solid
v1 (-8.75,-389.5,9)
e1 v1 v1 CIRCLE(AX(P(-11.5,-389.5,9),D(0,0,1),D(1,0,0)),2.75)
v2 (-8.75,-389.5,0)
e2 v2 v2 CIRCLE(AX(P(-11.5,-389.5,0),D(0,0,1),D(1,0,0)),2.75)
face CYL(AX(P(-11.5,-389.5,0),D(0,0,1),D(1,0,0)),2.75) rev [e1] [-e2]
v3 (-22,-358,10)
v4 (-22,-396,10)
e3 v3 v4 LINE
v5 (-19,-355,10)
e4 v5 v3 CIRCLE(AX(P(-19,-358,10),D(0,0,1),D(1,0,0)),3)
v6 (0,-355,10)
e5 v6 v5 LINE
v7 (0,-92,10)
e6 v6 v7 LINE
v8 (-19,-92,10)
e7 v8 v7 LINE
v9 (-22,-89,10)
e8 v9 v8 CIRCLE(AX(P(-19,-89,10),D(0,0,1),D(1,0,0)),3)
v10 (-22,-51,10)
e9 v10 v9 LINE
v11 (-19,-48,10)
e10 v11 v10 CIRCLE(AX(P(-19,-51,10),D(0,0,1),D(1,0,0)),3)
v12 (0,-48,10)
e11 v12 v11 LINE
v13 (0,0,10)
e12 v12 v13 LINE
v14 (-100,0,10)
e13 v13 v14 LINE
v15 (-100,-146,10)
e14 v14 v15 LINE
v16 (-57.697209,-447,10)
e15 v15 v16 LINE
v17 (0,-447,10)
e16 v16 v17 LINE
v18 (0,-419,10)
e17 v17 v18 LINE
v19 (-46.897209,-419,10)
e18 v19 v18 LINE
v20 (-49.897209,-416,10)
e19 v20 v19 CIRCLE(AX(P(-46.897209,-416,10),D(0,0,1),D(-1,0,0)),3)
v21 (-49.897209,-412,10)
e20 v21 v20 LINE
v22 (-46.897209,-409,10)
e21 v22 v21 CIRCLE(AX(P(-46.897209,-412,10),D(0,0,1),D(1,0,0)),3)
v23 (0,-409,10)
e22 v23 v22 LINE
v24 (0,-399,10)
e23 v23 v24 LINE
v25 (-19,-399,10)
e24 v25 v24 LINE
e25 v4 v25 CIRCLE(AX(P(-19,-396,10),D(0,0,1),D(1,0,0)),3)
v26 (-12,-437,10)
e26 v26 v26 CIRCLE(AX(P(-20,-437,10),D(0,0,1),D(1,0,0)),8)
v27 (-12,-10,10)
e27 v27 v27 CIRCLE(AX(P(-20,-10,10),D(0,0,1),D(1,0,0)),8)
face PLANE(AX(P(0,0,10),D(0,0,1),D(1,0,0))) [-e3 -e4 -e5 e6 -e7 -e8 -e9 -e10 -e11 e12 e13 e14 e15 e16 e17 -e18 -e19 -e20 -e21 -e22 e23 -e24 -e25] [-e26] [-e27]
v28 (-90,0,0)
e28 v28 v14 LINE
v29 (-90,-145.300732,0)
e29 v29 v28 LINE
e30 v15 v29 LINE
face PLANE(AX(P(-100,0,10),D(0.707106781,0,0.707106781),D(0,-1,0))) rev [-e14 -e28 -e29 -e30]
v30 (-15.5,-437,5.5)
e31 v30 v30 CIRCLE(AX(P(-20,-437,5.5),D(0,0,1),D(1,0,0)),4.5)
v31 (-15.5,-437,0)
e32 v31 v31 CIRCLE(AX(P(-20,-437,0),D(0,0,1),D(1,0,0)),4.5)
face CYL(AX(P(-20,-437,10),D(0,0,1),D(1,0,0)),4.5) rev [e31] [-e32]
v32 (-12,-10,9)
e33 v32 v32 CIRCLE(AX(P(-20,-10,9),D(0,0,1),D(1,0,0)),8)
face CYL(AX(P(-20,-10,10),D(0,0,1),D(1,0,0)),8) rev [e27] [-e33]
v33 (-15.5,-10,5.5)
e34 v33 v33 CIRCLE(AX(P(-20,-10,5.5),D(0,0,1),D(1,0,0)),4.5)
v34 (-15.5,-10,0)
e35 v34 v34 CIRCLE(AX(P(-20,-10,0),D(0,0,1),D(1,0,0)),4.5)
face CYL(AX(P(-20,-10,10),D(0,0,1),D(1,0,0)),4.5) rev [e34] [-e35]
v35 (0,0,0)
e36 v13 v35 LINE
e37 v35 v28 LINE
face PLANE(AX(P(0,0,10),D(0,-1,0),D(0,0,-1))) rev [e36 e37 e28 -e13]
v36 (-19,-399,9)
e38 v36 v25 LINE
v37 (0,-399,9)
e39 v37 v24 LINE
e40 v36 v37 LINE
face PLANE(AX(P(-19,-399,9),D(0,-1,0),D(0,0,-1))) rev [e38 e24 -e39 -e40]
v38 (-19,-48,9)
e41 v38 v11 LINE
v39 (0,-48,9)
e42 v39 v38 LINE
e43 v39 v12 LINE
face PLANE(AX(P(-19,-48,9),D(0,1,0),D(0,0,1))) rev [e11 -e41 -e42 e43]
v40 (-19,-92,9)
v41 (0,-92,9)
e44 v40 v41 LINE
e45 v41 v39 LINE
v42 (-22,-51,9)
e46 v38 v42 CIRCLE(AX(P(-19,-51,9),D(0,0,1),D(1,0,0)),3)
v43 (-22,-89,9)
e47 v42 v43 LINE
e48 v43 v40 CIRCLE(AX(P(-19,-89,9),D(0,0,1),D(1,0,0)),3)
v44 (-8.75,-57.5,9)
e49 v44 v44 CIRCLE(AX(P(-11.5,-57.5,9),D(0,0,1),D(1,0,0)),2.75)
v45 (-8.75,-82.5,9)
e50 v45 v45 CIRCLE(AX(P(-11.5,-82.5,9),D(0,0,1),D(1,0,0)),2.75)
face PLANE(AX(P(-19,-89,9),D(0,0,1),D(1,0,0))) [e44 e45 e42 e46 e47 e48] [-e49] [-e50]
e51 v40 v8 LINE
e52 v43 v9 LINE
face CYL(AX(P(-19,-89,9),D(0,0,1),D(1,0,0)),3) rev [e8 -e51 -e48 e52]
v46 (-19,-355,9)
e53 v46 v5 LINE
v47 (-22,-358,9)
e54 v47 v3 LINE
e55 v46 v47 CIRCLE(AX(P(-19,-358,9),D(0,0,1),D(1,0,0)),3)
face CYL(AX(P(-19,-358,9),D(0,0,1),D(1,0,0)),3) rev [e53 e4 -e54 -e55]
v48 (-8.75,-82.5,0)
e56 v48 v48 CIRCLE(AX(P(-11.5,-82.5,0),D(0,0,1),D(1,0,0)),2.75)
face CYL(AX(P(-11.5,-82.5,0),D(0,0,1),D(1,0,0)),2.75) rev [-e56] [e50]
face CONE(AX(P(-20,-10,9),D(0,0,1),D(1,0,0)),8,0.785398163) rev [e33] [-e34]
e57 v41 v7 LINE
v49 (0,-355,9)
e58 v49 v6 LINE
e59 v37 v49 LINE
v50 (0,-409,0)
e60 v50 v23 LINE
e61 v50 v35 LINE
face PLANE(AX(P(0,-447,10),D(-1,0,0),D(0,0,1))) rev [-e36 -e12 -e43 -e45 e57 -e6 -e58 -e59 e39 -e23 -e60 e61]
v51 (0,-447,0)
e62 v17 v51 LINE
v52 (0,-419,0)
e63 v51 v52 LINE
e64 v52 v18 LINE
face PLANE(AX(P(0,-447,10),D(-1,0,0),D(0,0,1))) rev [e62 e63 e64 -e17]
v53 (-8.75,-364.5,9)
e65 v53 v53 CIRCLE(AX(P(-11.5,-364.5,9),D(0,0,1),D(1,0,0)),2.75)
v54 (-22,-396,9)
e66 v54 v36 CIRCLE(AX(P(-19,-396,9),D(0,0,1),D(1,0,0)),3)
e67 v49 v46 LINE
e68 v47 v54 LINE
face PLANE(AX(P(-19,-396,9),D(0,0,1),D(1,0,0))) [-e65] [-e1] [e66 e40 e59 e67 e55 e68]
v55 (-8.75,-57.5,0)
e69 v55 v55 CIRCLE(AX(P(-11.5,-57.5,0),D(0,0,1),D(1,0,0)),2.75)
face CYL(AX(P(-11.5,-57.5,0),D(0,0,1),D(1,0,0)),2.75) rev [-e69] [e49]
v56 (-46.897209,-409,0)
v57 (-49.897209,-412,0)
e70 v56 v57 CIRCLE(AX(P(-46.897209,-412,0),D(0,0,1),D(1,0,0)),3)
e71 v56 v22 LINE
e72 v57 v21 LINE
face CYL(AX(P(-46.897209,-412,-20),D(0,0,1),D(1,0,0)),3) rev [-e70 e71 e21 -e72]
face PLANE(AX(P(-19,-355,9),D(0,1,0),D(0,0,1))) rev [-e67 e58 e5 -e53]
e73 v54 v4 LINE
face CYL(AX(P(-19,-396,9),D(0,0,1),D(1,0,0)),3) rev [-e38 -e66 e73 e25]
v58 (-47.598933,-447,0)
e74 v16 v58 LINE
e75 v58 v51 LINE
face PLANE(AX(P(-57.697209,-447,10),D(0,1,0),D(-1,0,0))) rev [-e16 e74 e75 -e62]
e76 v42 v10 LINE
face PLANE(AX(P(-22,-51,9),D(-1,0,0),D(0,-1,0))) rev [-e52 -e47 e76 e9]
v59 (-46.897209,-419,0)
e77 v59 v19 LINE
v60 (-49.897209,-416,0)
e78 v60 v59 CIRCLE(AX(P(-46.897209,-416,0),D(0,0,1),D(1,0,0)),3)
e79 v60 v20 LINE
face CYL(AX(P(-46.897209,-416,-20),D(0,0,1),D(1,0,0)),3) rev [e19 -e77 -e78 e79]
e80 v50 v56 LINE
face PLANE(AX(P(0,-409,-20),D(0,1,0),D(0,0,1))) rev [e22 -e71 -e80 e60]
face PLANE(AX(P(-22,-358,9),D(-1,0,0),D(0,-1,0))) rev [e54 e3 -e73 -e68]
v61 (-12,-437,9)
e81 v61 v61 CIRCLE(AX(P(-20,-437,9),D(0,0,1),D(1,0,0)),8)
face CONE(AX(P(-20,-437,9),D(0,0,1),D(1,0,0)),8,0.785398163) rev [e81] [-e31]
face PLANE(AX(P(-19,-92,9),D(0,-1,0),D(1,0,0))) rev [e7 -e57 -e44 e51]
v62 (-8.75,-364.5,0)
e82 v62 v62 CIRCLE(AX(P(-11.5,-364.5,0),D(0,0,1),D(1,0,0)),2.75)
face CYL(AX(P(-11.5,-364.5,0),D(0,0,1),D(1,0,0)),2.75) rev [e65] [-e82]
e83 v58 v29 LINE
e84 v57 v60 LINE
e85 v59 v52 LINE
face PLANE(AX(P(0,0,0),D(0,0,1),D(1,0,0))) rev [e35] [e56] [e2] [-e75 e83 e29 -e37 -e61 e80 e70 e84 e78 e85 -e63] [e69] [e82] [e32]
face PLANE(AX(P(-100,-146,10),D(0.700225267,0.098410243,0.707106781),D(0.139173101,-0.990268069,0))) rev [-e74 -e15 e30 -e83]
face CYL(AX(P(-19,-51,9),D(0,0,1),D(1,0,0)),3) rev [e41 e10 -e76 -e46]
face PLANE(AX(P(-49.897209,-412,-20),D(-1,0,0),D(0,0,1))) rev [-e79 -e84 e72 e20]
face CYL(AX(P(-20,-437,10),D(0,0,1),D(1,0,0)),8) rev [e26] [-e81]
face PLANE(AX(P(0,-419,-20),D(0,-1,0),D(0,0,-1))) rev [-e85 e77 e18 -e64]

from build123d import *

# Parameters (mm, degrees)
BOSS_EXTRUDE1_DEPTH                          = 10
CHAMFER1_SIZE                                = 10
CSK_FOR_M8_HEX_SOCKET_COUNTERSUNK_HE_2_COUNT = 2
CSK_FOR_M8_HEX_SOCKET_COUNTERSUNK_HE_2_PITCH = 427
CUT_EXTRUDE1_DEPTH                           = 30
CUT_EXTRUDE2_DEPTH                           = 1
SKETCH6_R                                    = 2.75
CUT_EXTRUDE3_DEPTH                           = 459.137533935


with BuildPart() as part:
    # Sketch1 → Boss-Extrude1 (new body)
    with BuildSketch(Plane.XY):
        Polygon((0, 0), (-100, 0), (-100, -146), (-57.697208755, -447), (0, -447), align=None)
    extrude(amount=BOSS_EXTRUDE1_DEPTH)

    # Chamfer1
    chamfer1_edges = [part.edges().sort_by_distance(p)[0] for p in [
        (-78.848604377, -296.5, 0),
        (-100, -73, 0),
    ]]
    chamfer(chamfer1_edges, length=CHAMFER1_SIZE - 0.0001)  # a hair under: the kernel refuses the full size

    # Sketch3 → CSK for M8 Hex Socket Countersunk Head Screw1 (revolve, cut)
    with BuildSketch(Plane(origin=(-20, -10, 10), x_dir=(0, -1, 0), z_dir=(1, 0, 0))):
        Polygon((0, 0), (0, 10), (4.5, 10), (4.5, 4.5), (8, 1), (8, 0), align=None)
    csk_for_m8_hex_socket_countersunk_head_s = revolve(axis=Axis((-20, -10, 16.35), (0, 0, -1)), mode=Mode.SUBTRACT)

    # CSK for M8 Hex Socket Countersunk He 2: CSK for M8 Hex Socket Countersunk Head Screw1 ×2
    with Locations(*[(0, -i * CSK_FOR_M8_HEX_SOCKET_COUNTERSUNK_HE_2_PITCH, 0) for i in range(1, CSK_FOR_M8_HEX_SOCKET_COUNTERSUNK_HE_2_COUNT)]):
        add(csk_for_m8_hex_socket_countersunk_head_s, mode=Mode.SUBTRACT)

    # Sketch4 → Cut-Extrude1 (cut)
    with BuildSketch(Plane.XY.offset(10)):
        with BuildLine():
            Line((0, -409), (-46.897208755, -409))
            ThreePointArc((-46.897208755, -409), (-49.018529098, -409.878679656), (-49.897208755, -412))
            Line((-49.897208755, -412), (-49.897208755, -416))
            ThreePointArc((-49.897208755, -416), (-49.018529098, -418.121320344), (-46.897208755, -419))
            Line((-46.897208755, -419), (0, -419))
            Line((0, -419), (0, -409))
        make_face()
    extrude(amount=-CUT_EXTRUDE1_DEPTH, mode=Mode.SUBTRACT)

    # Sketch5 → Cut-Extrude2 (cut)
    with BuildSketch(Plane.XY.offset(10)):
        with BuildLine():
            Line((-19, -48), (0, -48))
            Line((0, -48), (0, -92))
            Line((0, -92), (-19, -92))
            ThreePointArc((-19, -92), (-21.121320344, -91.121320344), (-22, -89))
            Line((-22, -89), (-22, -51))
            ThreePointArc((-22, -51), (-21.121320344, -48.878679656), (-19, -48))
        make_face()
        with BuildLine():
            Line((-19, -355), (0, -355))
            Line((0, -355), (0, -399))
            Line((0, -399), (-19, -399))
            ThreePointArc((-19, -399), (-21.121320344, -398.121320344), (-22, -396))
            Line((-22, -396), (-22, -358))
            ThreePointArc((-22, -358), (-21.121320344, -355.878679656), (-19, -355))
        make_face()
    extrude(amount=-CUT_EXTRUDE2_DEPTH, mode=Mode.SUBTRACT)

    # Sketch6 → Cut-Extrude3 (cut, through all)
    with BuildSketch(Plane.XY.offset(9)):
        with Locations((-11.5, -57.5)):
            Circle(SKETCH6_R)
        with Locations((-11.5, -82.5)):
            Circle(SKETCH6_R)
        with Locations((-11.5, -364.5)):
            Circle(SKETCH6_R)
        with Locations((-11.5, -389.5)):
            Circle(SKETCH6_R)
    extrude(amount=-CUT_EXTRUDE3_DEPTH, mode=Mode.SUBTRACT)


solid = part.part
